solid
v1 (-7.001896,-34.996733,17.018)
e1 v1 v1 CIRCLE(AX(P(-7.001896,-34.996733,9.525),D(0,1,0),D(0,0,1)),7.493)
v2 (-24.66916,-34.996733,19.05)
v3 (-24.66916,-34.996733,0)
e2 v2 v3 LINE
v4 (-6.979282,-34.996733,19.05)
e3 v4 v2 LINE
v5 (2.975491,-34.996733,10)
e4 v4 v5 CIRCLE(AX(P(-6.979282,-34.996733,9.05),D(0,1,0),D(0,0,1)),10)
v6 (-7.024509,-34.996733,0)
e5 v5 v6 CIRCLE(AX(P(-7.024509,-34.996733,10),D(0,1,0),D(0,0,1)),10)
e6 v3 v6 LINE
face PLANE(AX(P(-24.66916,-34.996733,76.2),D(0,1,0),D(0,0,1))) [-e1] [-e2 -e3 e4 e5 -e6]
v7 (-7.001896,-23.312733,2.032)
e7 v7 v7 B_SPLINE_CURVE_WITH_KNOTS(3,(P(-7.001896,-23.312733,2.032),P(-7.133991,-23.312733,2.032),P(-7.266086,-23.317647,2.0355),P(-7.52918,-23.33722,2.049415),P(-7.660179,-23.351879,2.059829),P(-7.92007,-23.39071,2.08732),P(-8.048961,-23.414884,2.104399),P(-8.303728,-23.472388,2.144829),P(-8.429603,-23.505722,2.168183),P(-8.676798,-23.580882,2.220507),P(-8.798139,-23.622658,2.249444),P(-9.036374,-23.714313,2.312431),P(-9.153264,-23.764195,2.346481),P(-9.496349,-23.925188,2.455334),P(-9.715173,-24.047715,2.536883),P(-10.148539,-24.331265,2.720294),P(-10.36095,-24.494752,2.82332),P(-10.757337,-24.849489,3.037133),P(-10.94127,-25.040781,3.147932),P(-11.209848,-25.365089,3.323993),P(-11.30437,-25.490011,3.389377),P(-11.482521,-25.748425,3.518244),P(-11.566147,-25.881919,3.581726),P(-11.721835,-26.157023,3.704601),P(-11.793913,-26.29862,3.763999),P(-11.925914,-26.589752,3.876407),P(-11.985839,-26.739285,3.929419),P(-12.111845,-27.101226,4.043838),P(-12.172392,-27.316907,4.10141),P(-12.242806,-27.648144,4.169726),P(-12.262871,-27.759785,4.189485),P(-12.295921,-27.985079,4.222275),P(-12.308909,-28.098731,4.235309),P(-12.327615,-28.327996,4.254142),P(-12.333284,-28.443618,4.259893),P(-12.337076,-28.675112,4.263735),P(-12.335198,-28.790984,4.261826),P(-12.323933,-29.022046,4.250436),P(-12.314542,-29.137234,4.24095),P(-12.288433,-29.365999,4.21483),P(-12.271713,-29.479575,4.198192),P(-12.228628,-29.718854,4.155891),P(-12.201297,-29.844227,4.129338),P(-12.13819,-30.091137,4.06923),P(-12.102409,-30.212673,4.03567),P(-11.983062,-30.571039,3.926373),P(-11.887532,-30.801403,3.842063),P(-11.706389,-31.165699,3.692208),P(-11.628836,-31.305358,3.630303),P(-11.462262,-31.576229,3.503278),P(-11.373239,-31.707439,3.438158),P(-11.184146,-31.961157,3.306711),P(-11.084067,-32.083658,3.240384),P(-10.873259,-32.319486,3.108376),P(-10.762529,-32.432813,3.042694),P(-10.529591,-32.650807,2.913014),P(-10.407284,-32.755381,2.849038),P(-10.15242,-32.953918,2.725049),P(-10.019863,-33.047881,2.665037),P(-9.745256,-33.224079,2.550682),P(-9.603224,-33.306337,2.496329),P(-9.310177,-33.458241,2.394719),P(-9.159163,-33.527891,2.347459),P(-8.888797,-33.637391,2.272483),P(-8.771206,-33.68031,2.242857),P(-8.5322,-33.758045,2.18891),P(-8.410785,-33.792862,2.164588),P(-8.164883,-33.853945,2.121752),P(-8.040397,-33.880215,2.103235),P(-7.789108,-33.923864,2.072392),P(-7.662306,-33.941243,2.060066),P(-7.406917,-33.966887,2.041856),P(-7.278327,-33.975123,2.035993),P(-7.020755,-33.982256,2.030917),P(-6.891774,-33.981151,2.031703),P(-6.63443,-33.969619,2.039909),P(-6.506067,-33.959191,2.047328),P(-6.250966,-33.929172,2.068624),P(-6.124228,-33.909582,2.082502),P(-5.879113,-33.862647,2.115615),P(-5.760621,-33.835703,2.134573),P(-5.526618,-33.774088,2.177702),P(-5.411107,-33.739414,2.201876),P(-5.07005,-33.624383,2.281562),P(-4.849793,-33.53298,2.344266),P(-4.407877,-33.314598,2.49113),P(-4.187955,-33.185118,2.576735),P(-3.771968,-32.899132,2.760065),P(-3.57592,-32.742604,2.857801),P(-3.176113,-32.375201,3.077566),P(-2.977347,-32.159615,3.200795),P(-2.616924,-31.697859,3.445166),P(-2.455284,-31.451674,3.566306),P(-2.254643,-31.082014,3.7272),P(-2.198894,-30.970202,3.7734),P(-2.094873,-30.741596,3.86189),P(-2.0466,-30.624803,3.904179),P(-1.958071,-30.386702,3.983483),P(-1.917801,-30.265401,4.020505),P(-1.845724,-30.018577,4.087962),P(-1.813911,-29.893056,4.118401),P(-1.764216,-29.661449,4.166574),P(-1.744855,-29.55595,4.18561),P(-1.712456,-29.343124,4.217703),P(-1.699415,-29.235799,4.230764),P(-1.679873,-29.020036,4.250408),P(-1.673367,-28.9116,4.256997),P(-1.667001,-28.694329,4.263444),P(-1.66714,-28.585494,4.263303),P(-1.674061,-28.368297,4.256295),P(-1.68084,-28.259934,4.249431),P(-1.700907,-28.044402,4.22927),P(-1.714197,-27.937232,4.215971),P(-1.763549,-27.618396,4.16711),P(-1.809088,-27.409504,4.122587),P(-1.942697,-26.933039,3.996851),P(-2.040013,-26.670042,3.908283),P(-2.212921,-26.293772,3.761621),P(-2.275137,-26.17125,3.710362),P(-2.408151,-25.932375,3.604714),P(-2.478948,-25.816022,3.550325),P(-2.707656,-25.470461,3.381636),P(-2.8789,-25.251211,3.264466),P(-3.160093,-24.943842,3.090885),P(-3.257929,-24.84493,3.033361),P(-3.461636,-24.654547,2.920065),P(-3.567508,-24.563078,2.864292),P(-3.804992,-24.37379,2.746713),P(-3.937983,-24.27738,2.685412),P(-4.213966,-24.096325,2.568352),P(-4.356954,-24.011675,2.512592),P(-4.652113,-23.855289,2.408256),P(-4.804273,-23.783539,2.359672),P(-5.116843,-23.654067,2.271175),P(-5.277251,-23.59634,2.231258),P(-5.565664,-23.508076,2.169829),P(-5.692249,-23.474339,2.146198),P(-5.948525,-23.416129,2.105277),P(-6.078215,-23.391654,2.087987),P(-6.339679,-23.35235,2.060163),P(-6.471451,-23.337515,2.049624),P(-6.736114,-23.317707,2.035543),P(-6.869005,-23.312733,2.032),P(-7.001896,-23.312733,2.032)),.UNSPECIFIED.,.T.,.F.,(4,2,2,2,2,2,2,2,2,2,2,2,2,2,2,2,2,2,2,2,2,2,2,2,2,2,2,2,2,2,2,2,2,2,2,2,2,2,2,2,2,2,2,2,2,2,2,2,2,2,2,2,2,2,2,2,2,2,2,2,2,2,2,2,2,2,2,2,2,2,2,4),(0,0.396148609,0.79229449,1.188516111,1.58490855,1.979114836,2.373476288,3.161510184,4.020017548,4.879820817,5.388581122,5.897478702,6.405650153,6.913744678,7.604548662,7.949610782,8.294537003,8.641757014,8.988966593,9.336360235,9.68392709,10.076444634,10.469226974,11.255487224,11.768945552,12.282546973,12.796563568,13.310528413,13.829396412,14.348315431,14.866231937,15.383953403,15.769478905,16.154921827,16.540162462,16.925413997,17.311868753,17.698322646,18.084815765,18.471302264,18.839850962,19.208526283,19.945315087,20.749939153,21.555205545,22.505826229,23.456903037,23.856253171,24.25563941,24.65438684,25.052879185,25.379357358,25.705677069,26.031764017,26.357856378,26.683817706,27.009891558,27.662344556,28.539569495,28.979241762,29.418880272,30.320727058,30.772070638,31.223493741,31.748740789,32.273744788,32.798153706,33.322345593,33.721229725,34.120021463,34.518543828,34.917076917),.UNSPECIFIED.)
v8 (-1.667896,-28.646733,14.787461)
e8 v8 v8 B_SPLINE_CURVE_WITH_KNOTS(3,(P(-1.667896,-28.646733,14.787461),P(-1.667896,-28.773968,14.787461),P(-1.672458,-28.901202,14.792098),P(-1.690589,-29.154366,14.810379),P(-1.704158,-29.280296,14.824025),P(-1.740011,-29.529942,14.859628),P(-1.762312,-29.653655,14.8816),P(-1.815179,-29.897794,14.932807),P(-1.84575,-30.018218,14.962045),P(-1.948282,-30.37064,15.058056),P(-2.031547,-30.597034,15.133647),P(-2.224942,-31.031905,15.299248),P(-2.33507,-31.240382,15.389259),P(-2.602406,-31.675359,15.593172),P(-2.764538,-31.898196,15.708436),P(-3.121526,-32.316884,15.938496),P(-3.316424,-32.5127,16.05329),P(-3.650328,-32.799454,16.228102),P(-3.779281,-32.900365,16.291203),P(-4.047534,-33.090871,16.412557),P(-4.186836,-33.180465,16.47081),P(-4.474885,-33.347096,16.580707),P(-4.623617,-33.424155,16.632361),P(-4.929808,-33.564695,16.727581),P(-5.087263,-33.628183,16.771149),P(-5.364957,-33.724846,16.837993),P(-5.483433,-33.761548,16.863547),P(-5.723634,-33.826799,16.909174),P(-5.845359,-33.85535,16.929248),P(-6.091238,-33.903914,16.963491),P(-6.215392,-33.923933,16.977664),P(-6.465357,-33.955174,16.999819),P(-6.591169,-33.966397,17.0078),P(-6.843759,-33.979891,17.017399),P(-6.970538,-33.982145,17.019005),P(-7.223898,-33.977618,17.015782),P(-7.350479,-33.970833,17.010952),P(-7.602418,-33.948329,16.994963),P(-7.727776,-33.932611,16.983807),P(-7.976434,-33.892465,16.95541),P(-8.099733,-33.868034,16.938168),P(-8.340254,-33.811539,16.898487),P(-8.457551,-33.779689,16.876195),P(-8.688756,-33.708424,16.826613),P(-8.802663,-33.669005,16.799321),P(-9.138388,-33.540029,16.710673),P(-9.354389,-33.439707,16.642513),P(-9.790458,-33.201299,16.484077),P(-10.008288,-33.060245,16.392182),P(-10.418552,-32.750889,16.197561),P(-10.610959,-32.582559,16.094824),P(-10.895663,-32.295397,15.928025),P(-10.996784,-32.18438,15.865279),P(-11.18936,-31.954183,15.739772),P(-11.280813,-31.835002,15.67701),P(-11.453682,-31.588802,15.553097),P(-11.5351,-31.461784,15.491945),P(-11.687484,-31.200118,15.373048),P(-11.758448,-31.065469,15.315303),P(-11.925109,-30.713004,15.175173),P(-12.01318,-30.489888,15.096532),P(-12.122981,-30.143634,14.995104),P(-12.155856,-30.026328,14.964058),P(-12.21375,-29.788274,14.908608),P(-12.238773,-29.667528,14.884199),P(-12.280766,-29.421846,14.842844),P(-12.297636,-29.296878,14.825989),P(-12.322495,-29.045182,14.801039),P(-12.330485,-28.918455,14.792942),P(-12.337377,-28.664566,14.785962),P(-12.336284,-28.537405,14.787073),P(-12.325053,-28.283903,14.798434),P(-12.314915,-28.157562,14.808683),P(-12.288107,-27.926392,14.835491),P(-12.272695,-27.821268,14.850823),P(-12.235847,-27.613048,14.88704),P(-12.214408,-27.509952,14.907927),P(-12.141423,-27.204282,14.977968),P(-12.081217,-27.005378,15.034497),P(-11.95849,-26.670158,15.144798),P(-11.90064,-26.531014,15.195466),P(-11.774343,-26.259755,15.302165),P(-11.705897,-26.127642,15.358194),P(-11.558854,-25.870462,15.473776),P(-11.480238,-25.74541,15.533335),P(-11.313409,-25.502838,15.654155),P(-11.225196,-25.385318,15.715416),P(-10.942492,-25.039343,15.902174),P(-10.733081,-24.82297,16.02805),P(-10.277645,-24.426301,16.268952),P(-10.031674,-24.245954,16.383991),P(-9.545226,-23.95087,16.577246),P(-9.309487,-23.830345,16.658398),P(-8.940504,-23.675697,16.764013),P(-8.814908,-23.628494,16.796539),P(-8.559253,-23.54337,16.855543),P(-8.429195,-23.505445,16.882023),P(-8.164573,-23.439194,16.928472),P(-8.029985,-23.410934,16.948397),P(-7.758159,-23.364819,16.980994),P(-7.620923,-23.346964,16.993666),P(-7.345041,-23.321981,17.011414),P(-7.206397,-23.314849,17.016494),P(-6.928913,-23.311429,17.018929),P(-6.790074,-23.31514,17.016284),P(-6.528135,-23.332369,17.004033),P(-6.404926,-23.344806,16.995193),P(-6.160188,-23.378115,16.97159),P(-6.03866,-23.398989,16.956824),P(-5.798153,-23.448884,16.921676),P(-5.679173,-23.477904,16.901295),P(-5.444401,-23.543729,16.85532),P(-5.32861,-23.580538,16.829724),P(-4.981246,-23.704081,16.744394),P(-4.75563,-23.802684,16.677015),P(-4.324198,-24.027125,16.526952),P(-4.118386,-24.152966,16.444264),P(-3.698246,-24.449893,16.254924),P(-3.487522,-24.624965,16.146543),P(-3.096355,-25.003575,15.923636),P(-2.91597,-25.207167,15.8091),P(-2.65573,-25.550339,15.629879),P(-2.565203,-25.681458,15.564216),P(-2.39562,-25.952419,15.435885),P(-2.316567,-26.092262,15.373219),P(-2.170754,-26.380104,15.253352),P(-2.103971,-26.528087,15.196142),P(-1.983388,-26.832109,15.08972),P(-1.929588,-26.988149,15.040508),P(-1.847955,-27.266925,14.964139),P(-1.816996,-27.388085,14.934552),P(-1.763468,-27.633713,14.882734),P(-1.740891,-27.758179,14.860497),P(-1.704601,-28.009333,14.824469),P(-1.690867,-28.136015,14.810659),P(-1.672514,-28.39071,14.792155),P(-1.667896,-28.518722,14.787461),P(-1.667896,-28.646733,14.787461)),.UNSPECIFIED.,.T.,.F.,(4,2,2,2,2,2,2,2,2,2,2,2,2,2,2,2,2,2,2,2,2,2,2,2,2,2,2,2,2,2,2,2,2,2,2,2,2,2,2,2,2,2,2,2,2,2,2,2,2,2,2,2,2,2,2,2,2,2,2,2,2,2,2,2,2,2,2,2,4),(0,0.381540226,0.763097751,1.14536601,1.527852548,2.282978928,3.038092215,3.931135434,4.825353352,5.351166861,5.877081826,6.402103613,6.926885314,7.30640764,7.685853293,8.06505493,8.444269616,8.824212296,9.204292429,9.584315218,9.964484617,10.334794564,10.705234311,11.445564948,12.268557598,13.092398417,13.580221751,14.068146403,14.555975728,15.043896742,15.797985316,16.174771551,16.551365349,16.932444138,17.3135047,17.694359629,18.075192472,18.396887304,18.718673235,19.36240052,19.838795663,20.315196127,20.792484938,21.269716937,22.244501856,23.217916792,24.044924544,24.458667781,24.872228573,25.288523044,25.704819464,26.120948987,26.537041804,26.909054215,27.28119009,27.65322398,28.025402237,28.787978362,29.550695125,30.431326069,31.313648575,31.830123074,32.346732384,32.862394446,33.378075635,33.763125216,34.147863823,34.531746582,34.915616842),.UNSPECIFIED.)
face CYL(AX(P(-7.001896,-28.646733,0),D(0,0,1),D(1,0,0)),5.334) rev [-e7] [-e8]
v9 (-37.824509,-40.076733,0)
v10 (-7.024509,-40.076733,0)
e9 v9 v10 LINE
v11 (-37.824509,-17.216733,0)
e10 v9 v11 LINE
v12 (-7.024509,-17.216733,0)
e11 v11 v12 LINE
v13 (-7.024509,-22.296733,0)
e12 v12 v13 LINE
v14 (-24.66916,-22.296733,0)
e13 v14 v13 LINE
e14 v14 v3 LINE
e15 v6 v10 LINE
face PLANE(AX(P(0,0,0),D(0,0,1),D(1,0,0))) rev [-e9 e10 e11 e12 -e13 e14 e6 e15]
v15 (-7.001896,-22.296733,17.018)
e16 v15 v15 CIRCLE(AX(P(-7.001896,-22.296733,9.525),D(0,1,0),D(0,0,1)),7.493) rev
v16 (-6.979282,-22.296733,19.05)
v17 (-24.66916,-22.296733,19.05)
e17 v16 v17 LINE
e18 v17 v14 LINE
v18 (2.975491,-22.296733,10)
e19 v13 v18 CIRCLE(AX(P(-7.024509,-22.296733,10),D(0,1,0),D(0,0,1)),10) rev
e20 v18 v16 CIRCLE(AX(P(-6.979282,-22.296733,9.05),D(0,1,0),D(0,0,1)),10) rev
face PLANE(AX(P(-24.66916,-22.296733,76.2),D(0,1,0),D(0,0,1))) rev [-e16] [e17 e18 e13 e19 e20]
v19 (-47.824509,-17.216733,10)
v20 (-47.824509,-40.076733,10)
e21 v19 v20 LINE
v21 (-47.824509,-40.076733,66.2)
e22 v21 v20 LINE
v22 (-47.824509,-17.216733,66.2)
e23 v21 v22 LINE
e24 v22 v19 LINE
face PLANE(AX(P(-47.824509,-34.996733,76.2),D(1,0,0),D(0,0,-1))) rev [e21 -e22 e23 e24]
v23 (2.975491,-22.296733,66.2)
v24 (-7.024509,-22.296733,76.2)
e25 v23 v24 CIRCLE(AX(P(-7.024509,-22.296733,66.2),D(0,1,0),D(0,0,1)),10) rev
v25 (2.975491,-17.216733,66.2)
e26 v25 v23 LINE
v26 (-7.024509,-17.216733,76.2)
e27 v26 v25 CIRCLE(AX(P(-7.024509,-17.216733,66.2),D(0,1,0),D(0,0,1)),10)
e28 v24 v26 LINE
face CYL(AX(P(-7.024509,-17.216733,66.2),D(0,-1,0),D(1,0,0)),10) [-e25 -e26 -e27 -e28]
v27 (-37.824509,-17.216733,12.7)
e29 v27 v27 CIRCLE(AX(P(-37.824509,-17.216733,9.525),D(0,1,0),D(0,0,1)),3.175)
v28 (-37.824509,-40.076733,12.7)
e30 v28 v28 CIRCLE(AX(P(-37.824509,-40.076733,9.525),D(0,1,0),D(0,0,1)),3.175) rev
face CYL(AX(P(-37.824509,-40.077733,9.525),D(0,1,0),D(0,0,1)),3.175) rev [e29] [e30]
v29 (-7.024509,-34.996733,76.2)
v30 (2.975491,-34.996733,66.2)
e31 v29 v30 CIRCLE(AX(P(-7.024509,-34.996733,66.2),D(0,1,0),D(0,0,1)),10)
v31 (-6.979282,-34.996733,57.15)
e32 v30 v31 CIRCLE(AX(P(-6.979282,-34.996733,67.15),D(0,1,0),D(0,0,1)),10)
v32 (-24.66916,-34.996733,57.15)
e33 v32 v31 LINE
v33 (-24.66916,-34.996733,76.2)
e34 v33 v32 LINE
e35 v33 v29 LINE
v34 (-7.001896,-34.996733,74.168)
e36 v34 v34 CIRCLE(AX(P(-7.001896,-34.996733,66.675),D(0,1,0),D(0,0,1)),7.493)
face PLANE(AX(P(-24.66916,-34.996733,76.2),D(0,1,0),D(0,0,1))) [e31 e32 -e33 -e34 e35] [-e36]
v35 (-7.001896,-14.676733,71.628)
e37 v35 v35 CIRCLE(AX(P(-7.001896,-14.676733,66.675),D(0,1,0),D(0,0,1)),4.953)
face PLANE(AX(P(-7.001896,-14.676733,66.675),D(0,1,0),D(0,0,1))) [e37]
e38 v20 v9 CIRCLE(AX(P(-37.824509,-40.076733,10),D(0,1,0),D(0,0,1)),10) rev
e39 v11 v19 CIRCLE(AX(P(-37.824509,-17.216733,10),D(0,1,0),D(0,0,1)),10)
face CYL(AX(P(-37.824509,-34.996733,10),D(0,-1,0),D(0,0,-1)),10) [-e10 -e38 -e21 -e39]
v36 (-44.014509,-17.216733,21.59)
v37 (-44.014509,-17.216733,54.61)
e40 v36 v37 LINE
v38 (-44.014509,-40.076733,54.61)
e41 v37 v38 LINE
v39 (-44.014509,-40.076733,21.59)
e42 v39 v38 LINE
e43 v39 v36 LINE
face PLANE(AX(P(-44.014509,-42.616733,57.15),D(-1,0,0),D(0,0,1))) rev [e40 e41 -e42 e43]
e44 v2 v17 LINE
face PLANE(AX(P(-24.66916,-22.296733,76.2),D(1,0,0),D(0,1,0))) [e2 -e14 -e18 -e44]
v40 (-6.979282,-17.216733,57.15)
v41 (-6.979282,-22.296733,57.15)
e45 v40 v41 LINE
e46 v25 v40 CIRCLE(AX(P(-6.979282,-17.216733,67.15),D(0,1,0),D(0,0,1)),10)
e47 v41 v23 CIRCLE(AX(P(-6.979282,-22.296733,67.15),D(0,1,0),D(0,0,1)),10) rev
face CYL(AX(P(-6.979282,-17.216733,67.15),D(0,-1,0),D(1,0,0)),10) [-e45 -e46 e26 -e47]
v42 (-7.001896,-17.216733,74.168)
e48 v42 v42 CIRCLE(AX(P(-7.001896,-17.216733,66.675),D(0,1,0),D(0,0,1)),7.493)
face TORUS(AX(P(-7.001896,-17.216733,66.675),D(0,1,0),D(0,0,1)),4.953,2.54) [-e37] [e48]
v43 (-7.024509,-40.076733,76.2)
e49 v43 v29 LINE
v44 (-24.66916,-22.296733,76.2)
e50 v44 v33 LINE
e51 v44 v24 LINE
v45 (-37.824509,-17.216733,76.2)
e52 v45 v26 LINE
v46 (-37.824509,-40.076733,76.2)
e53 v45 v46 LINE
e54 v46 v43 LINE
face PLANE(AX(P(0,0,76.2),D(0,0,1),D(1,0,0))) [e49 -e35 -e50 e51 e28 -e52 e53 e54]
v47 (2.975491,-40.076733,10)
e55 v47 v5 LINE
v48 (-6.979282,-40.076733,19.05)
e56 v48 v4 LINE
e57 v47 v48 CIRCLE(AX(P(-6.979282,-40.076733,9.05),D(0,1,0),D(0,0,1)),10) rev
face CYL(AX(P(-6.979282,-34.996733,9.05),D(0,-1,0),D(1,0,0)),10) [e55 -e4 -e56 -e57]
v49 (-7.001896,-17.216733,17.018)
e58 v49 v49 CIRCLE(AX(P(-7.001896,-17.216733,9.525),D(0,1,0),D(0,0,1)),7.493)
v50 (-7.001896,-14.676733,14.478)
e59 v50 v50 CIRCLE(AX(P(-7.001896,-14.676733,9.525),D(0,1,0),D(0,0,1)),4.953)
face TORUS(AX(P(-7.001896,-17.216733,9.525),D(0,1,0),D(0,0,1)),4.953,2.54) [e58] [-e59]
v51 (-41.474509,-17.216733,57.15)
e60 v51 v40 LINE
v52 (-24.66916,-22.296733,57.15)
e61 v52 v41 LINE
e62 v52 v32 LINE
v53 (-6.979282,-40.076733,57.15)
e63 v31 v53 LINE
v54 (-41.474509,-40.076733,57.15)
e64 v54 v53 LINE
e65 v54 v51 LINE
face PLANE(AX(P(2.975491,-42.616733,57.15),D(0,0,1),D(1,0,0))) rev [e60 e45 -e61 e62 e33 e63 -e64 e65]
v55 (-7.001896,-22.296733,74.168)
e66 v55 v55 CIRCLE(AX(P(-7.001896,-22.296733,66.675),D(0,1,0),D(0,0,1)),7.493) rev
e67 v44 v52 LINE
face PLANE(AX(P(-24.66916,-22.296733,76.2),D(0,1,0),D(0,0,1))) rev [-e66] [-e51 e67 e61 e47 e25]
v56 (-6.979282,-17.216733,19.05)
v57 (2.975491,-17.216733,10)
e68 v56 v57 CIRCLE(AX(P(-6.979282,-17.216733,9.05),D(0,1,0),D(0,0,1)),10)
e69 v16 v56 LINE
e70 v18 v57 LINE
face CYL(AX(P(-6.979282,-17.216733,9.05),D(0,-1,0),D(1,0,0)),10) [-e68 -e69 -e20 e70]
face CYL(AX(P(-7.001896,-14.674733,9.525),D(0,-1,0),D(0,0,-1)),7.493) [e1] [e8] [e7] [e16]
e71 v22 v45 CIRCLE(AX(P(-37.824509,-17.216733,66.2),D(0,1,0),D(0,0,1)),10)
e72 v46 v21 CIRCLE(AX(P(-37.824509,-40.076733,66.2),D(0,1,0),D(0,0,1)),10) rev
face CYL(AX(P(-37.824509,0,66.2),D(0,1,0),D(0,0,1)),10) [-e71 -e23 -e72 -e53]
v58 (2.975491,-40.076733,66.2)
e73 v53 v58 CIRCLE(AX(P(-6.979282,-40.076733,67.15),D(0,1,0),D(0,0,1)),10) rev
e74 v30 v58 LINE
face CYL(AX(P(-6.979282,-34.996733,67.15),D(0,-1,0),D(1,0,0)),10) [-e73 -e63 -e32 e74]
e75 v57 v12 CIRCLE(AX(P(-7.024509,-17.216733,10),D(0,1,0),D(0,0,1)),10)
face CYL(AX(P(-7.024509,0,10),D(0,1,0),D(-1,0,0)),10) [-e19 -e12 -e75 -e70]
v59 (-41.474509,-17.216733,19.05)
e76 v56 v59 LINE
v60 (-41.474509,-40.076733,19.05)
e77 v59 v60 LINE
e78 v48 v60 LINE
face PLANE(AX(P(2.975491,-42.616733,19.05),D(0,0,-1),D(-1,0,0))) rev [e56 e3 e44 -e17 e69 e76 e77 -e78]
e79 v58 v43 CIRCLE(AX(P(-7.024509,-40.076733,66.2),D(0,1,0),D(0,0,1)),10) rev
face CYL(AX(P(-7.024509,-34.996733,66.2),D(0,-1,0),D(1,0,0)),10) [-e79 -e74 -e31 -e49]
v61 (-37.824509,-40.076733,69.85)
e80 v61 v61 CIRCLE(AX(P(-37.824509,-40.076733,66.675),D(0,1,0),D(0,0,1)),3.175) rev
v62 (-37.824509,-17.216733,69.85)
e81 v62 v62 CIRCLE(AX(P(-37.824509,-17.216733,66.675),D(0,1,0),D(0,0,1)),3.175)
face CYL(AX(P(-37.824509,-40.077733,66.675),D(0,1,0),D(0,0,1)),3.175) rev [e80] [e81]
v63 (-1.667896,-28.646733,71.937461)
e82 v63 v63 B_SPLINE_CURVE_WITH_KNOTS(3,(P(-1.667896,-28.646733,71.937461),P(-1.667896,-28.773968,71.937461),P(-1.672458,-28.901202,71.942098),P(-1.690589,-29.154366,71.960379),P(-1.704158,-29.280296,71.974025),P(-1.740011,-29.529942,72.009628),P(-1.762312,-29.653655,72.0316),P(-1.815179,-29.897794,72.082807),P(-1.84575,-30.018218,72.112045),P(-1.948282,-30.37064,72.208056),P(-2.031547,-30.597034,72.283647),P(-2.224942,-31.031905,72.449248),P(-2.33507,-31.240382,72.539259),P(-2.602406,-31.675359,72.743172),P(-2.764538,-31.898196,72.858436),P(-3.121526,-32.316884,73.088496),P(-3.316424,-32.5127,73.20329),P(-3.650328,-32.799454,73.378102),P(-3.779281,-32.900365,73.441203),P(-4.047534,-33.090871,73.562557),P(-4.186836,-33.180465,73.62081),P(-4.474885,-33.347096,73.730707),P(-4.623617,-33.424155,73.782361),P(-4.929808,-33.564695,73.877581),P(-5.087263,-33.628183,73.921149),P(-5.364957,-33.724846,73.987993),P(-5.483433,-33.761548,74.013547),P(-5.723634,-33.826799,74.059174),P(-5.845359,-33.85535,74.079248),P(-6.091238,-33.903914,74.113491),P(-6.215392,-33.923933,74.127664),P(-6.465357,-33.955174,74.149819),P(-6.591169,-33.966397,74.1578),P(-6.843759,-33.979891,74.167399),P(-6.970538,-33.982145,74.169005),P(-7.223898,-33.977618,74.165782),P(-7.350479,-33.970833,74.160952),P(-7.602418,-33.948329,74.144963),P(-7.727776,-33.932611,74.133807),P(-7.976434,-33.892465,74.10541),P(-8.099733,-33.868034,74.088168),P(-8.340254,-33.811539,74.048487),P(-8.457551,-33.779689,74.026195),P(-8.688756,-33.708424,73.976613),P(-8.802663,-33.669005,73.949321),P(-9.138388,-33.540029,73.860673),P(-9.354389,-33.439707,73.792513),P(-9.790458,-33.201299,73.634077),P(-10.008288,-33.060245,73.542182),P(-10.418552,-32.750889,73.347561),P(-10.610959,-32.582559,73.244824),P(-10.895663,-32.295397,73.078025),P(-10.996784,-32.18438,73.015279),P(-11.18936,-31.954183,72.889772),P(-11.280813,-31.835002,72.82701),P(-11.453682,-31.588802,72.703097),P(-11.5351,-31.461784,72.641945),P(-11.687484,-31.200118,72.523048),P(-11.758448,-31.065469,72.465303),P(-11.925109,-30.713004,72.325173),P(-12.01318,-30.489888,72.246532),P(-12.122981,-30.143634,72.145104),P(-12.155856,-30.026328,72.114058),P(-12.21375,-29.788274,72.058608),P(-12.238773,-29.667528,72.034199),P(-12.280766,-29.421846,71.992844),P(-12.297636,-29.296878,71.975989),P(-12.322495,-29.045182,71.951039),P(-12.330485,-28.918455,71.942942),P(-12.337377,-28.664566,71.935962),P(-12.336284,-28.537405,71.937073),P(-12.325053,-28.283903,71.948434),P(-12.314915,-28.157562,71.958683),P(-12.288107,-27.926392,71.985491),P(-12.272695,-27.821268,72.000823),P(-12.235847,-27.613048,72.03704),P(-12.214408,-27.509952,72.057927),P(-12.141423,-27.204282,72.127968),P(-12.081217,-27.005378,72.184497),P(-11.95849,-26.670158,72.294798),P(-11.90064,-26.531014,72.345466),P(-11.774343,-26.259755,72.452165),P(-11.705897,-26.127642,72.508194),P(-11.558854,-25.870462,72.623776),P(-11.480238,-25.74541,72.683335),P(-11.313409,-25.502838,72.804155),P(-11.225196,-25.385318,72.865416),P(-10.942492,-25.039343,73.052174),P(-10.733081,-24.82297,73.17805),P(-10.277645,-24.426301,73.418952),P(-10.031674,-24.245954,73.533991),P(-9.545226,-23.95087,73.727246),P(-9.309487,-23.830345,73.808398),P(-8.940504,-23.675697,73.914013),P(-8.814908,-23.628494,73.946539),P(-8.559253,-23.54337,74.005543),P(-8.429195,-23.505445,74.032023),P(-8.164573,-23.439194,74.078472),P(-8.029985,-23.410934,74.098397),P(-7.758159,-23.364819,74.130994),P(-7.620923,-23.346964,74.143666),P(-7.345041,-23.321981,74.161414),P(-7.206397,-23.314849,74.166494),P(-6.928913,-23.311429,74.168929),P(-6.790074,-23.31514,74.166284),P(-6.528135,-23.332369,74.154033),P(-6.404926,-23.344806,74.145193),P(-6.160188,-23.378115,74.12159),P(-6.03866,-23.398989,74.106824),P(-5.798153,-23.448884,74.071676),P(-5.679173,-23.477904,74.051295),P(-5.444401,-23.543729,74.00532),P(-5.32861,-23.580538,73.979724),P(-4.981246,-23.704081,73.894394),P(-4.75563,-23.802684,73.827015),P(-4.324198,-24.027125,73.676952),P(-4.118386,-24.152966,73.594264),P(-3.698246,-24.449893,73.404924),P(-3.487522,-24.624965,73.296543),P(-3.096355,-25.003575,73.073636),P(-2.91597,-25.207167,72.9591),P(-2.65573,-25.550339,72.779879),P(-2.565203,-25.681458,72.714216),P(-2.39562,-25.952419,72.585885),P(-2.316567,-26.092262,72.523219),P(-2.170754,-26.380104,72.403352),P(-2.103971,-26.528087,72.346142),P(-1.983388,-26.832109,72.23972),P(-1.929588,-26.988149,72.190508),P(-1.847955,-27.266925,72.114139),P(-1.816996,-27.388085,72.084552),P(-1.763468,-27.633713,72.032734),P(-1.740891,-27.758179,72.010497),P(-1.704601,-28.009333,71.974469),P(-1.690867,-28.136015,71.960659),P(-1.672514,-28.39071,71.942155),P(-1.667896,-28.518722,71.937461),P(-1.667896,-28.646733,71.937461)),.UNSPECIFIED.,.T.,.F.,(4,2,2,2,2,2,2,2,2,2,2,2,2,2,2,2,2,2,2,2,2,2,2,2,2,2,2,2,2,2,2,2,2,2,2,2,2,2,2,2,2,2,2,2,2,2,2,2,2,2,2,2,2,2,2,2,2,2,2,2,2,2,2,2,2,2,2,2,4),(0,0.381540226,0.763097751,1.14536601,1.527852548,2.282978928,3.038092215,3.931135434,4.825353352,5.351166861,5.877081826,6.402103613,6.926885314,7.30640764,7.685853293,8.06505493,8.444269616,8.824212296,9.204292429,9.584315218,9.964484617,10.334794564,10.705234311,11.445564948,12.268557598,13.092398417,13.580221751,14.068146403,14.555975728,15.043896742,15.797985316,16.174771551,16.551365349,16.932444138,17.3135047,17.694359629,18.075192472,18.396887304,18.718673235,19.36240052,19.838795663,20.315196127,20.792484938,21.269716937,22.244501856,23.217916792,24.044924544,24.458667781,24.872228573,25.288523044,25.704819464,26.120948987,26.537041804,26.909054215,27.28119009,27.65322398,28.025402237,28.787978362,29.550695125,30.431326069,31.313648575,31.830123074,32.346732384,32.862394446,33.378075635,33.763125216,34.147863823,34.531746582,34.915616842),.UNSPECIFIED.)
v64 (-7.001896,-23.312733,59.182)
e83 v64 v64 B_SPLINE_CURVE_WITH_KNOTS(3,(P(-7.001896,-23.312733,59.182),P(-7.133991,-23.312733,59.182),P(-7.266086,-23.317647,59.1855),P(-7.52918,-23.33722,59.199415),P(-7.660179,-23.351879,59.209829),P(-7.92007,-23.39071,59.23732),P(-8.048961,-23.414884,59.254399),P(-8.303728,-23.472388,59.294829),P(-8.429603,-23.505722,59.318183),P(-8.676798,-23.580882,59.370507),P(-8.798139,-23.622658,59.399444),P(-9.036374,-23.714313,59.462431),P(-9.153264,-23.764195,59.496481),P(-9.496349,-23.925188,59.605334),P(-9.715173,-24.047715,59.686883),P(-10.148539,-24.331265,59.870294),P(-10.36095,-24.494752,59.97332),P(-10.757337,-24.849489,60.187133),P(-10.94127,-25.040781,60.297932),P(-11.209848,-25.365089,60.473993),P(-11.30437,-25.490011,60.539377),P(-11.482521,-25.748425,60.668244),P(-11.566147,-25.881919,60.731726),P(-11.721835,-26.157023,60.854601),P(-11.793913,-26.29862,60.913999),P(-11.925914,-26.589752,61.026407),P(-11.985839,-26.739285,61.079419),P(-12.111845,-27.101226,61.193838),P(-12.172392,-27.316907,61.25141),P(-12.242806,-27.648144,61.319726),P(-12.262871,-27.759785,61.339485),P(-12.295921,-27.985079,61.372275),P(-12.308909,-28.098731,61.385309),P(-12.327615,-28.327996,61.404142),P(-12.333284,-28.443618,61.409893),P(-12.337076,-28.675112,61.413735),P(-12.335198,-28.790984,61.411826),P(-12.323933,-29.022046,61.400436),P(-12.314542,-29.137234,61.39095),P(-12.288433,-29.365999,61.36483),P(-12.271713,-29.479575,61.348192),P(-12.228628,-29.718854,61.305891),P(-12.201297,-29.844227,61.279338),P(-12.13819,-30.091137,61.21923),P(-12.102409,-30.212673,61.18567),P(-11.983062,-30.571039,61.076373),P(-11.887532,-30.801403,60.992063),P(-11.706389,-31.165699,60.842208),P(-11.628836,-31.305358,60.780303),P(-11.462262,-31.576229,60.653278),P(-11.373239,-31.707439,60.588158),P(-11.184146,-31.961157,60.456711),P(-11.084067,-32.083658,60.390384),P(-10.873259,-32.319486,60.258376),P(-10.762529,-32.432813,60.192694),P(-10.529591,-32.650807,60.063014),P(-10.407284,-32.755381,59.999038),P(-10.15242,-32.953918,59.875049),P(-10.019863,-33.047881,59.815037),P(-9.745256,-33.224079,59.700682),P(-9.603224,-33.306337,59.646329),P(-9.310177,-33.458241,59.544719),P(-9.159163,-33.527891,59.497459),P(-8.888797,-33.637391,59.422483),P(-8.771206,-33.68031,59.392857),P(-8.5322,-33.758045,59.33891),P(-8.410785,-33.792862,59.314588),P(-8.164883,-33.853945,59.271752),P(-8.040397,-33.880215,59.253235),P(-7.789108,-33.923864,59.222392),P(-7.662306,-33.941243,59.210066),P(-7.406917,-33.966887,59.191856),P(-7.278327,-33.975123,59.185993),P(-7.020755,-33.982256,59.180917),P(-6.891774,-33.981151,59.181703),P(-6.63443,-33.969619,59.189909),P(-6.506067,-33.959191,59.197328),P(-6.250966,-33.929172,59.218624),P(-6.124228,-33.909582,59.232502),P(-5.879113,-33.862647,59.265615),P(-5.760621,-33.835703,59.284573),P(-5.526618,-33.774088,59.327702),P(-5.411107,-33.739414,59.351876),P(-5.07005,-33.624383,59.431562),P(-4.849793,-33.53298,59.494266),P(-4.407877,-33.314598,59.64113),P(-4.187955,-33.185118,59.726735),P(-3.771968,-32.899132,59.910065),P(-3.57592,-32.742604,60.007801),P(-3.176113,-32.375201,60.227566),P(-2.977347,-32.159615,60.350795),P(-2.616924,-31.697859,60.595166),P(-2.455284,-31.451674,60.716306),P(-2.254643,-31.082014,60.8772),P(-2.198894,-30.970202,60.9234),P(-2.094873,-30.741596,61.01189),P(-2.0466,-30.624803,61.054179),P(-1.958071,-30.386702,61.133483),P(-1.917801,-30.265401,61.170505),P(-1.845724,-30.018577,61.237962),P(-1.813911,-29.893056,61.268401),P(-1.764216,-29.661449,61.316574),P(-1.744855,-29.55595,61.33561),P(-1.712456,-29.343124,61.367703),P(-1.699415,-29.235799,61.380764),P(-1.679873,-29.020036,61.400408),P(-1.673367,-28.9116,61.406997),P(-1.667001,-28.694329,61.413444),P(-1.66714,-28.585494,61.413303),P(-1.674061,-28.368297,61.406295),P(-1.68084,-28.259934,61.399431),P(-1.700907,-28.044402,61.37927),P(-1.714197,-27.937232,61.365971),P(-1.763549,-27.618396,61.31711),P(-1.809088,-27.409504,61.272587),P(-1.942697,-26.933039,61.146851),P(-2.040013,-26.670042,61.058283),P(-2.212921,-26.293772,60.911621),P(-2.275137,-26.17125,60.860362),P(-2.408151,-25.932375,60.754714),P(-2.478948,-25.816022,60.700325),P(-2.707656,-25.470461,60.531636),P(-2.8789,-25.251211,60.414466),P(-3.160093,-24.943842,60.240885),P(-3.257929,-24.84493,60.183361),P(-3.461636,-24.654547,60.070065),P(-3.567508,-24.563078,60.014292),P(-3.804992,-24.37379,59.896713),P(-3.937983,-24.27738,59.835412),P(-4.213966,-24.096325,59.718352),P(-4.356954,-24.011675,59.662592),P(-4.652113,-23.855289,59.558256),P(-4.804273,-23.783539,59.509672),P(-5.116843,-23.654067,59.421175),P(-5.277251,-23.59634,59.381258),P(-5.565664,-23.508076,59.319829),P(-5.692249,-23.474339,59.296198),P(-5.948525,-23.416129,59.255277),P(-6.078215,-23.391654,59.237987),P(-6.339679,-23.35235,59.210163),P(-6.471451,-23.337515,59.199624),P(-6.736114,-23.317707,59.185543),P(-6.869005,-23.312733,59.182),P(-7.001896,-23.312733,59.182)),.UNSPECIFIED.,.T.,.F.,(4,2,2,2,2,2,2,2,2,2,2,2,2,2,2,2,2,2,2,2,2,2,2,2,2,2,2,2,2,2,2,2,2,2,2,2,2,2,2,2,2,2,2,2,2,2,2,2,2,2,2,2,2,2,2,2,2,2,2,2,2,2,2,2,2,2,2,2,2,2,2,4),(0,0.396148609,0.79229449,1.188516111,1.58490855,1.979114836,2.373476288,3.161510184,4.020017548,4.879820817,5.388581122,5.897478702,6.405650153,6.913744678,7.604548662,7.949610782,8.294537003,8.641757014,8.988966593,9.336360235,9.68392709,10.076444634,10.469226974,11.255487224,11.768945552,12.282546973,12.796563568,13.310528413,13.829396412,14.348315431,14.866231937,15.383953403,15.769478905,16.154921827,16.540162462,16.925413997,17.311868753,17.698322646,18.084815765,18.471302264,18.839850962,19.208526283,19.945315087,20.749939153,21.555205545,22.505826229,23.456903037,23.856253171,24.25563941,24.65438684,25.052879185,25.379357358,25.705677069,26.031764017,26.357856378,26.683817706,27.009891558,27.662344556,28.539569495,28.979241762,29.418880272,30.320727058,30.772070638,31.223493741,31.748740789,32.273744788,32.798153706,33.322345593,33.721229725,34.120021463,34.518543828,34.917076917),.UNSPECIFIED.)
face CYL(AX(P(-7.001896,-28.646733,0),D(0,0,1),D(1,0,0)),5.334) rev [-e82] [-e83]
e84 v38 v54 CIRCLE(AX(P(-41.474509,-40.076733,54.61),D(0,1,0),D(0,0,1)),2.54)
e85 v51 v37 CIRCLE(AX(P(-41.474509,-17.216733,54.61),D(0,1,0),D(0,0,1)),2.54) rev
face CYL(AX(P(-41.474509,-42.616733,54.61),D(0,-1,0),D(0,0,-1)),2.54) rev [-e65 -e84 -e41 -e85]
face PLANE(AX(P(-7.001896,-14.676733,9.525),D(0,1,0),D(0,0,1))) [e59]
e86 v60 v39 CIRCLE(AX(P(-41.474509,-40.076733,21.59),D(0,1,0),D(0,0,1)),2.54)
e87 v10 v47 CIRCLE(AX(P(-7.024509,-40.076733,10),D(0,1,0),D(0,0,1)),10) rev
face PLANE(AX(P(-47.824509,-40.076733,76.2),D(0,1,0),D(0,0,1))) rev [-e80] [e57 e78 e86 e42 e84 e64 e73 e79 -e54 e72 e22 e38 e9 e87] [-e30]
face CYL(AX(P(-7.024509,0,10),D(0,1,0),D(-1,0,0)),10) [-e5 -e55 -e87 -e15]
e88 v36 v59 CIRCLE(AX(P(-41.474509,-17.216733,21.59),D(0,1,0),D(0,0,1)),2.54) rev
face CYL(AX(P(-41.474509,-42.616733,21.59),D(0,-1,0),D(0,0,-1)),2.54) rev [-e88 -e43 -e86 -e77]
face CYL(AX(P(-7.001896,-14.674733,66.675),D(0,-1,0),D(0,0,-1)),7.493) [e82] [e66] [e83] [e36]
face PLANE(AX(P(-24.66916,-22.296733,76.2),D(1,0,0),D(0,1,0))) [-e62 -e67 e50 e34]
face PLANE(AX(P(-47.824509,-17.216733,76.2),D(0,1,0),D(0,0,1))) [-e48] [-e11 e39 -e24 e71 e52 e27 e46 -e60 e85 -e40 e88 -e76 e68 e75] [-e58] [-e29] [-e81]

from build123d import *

# Parameters (mm, degrees)
BOSS_EXTRUDE4_DEPTH = 76.2
FILLET1_R           = 10
SKETCH8_W           = 46.99
SKETCH8_H           = 38.1
CUT_EXTRUDE2_DEPTH  = 25.4
FILLET2_R           = 10
SKETCH9_R           = 7.493
BOSS_EXTRUDE5_DEPTH = 2.54
FILLET4_R           = 2.54
BOSS_EXTRUDE6_REACH = 94.231
SKETCH10_R          = 7.493
SKETCH11_R          = 5.334
CUT_EXTRUDE3_DEPTH  = 76.2
FILLET5_R           = 2.54
CUT_EXTRUDE5_REACH  = 94.824
SKETCH14_R          = 3.175


# Some blends are built 0.0001 mm under size
with BuildPart() as part:
    # Sketch7 → Boss-Extrude4 (new body)
    with BuildSketch(Plane.XY):
        Polygon((-47.824509335, -17.216733289), (2.975490665, -17.216733289), (2.975490665, -22.296733289), (-24.669160498, -22.296733289), (-24.669160498, -34.996733289), (2.975490665, -34.996733289), (2.975490665, -40.076733289), (-47.824509335, -40.076733289), (-47.824509335, -34.996733289), (-47.824509335, -22.296733289), align=None)
    extrude(amount=BOSS_EXTRUDE4_DEPTH)

    # Fillet1
    fillet1_edges = [part.edges().sort_by_distance(p)[0] for p in [
        (2.975490665, -19.756733289, 0),
        (2.975490665, -37.536733289, 0),
        (-47.824509335, -28.646733289, 0),
        (2.975490665, -37.536733289, 76.2),
        (2.975490665, -19.756733289, 76.2),
        (-47.824509335, -28.646733289, 76.2),
    ]]
    fillet(fillet1_edges, radius=FILLET1_R)

    # Sketch8 → Cut-Extrude2 (cut)
    with BuildSketch(Plane(origin=(0, -17.216733289, 0), x_dir=(1, 0, 0), z_dir=(0, 1, 0))):
        with Locations((-20.519509335, -38.1)):
            Rectangle(SKETCH8_W, SKETCH8_H)
    extrude(amount=-CUT_EXTRUDE2_DEPTH, mode=Mode.SUBTRACT)

    # Fillet2
    # the kernel refuses this fillet: 10 mm, written as the material it takes off along each edge
    with BuildSketch(Plane(origin=(2.975490665, -10.109801477, 57.15), x_dir=(-1, 0, 0), z_dir=(0, -1, 0)), Plane(origin=(2.975490665, 7.670198523, 57.15), x_dir=(-1, 0, 0), z_dir=(0, -1, 0))) as fillet2_piece_1:
        with BuildLine():
            CenterArc((9.954772725, -10), FILLET2_R, 90, 84.548680188)
            Line((0, -9.05), (-0.199095454, -9.031))
            ThreePointArc((-0.199095454, -9.031), (-0.2, -4.525), (-0.2, 0))
            Line((-0.2, 0), (0, 0.2))
            Line((0, 0.2), (9.954772725, 0.2))
            Line((9.954772725, 0.2), (9.954772725, 0))
        make_face()
    extrude(amount=54.853863623, mode=Mode.SUBTRACT)
    with BuildSketch(Plane(origin=(2.975490665, -10.109801477, 19.05), x_dir=(-1, 0, 0), z_dir=(0, -1, 0))) as fillet2_piece_2:
        with BuildLine():
            CenterArc((9.954772725, 10), FILLET2_R, 185.451319812, 84.548680188)
            Line((0, 9.05), (-0.199095454, 9.031))
            ThreePointArc((-0.199095454, 9.031), (-0.2, 4.525), (-0.2, 0))
            Line((-0.2, 0), (0, -0.2))
            Line((0, -0.2), (9.954772725, -0.2))
            Line((9.954772725, -0.2), (9.954772725, 0))
        make_face()
    extrude(amount=54.853863623, mode=Mode.SUBTRACT)
    with BuildSketch(Plane(origin=(2.975490665, 7.670198523, 19.05), x_dir=(0, 0, -1), z_dir=(0, -1, 0))) as fillet2_piece_3:
        with BuildLine():
            CenterArc((10, -9.954772725), FILLET2_R, 95.451319812, 84.548680188)
            Line((0, -9.954772725), (-0.2, -9.954772725))
            Line((-0.2, -9.954772725), (-0.2, 0))
            Line((-0.2, 0), (0, 0.2))
            ThreePointArc((0, 0.2), (4.525, 0.2), (9.031, 0.199095454))
            Line((9.031, 0.199095454), (9.05, 0))
        make_face()
    extrude(amount=54.853863623, mode=Mode.SUBTRACT)

    # Sketch9 → Boss-Extrude5 (add)
    with BuildSketch(Plane(origin=(0, -17.216733289, 0), x_dir=(1, 0, 0), z_dir=(0, 1, 0))):
        with Locations(Location((-7.001895697, -66.675, 0), (0, 0, 270))):
            Circle(SKETCH9_R)
        with Locations(Location((-7.001895697, -9.525, 0), (0, 0, 270))):
            Circle(SKETCH9_R)
    extrude(amount=BOSS_EXTRUDE5_DEPTH)

    # Fillet4
    fillet4_edges = [part.edges().sort_by_distance(p)[0] for p in [
        (-7.001895697, -14.676733289, 59.182),
        (-7.001895697, -14.676733289, 2.032),
    ]]
    fillet(fillet4_edges, radius=FILLET4_R - 0.0001)  # a hair under: the kernel refuses the full size

    # Sketch10 → Boss-Extrude6 (add, up to next)
    with BuildSketch(Plane(origin=(0, -34.996733289, 0), x_dir=(1, 0, 0), z_dir=(0, 1, 0)), mode=Mode.PRIVATE) as boss_extrude6_sk1:
        with Locations(Location((-7.001895697, -66.675, 0), (0, 0, 90))):
            Circle(SKETCH10_R)
    boss_extrude6_tool1 = extrude(boss_extrude6_sk1.sketch, amount=BOSS_EXTRUDE6_REACH, mode=Mode.PRIVATE) - part.part
    # Sketch10 → Boss-Extrude6 (add, up to next)
    with BuildSketch(Plane(origin=(0, -34.996733289, 0), x_dir=(1, 0, 0), z_dir=(0, 1, 0)), mode=Mode.PRIVATE) as boss_extrude6_sk2:
        with Locations(Location((-7.001895697, -9.525, 0), (0, 0, 90))):
            Circle(SKETCH10_R)
    boss_extrude6_tool2 = extrude(boss_extrude6_sk2.sketch, amount=BOSS_EXTRUDE6_REACH, mode=Mode.PRIVATE) - part.part
    add(boss_extrude6_tool1.solids().sort_by_distance((-7.001896, -34.996733, 66.675))[0])
    add(boss_extrude6_tool2.solids().sort_by_distance((-7.001896, -34.996733, 9.525))[0])

    # Sketch11 → Cut-Extrude3 (cut)
    with BuildSketch(Plane.XY.offset(76.2)):
        with Locations(Location((-7.001895697, -28.646733289, 0), (0, 0, 90.00000003))):
            Circle(SKETCH11_R)
    extrude(amount=-CUT_EXTRUDE3_DEPTH, mode=Mode.SUBTRACT)

    # Fillet5
    fillet5_edges = [part.edges().sort_by_distance(p)[0] for p in [
        (-44.014509335, -28.646733289, 57.15),
        (-44.014509335, -28.646733289, 19.05),
    ]]
    fillet(fillet5_edges, radius=FILLET5_R)

    # Sketch14 → Cut-Extrude5 (cut, up to next)
    with BuildSketch(Plane(origin=(0, -17.216733289, 0), x_dir=(1, 0, 0), z_dir=(0, 1, 0)), mode=Mode.PRIVATE) as cut_extrude5_sk1:
        with Locations(Location((-37.824509335, -9.525, 0), (0, 0, 270))):
            Circle(SKETCH14_R)
    cut_extrude5_tool1 = extrude(cut_extrude5_sk1.sketch, amount=-CUT_EXTRUDE5_REACH, mode=Mode.PRIVATE) & part.part
    # Sketch14 → Cut-Extrude5 (cut, up to next)
    with BuildSketch(Plane(origin=(0, -17.216733289, 0), x_dir=(1, 0, 0), z_dir=(0, 1, 0)), mode=Mode.PRIVATE) as cut_extrude5_sk2:
        with Locations(Location((-37.824509335, -66.675, 0), (0, 0, 270))):
            Circle(SKETCH14_R)
    cut_extrude5_tool2 = extrude(cut_extrude5_sk2.sketch, amount=-CUT_EXTRUDE5_REACH, mode=Mode.PRIVATE) & part.part
    add(cut_extrude5_tool1.solids().sort_by_distance((-37.824509, -17.216733, 9.525))[0], mode=Mode.SUBTRACT)
    add(cut_extrude5_tool2.solids().sort_by_distance((-37.824509, -17.216733, 66.675))[0], mode=Mode.SUBTRACT)


solid = part.part
